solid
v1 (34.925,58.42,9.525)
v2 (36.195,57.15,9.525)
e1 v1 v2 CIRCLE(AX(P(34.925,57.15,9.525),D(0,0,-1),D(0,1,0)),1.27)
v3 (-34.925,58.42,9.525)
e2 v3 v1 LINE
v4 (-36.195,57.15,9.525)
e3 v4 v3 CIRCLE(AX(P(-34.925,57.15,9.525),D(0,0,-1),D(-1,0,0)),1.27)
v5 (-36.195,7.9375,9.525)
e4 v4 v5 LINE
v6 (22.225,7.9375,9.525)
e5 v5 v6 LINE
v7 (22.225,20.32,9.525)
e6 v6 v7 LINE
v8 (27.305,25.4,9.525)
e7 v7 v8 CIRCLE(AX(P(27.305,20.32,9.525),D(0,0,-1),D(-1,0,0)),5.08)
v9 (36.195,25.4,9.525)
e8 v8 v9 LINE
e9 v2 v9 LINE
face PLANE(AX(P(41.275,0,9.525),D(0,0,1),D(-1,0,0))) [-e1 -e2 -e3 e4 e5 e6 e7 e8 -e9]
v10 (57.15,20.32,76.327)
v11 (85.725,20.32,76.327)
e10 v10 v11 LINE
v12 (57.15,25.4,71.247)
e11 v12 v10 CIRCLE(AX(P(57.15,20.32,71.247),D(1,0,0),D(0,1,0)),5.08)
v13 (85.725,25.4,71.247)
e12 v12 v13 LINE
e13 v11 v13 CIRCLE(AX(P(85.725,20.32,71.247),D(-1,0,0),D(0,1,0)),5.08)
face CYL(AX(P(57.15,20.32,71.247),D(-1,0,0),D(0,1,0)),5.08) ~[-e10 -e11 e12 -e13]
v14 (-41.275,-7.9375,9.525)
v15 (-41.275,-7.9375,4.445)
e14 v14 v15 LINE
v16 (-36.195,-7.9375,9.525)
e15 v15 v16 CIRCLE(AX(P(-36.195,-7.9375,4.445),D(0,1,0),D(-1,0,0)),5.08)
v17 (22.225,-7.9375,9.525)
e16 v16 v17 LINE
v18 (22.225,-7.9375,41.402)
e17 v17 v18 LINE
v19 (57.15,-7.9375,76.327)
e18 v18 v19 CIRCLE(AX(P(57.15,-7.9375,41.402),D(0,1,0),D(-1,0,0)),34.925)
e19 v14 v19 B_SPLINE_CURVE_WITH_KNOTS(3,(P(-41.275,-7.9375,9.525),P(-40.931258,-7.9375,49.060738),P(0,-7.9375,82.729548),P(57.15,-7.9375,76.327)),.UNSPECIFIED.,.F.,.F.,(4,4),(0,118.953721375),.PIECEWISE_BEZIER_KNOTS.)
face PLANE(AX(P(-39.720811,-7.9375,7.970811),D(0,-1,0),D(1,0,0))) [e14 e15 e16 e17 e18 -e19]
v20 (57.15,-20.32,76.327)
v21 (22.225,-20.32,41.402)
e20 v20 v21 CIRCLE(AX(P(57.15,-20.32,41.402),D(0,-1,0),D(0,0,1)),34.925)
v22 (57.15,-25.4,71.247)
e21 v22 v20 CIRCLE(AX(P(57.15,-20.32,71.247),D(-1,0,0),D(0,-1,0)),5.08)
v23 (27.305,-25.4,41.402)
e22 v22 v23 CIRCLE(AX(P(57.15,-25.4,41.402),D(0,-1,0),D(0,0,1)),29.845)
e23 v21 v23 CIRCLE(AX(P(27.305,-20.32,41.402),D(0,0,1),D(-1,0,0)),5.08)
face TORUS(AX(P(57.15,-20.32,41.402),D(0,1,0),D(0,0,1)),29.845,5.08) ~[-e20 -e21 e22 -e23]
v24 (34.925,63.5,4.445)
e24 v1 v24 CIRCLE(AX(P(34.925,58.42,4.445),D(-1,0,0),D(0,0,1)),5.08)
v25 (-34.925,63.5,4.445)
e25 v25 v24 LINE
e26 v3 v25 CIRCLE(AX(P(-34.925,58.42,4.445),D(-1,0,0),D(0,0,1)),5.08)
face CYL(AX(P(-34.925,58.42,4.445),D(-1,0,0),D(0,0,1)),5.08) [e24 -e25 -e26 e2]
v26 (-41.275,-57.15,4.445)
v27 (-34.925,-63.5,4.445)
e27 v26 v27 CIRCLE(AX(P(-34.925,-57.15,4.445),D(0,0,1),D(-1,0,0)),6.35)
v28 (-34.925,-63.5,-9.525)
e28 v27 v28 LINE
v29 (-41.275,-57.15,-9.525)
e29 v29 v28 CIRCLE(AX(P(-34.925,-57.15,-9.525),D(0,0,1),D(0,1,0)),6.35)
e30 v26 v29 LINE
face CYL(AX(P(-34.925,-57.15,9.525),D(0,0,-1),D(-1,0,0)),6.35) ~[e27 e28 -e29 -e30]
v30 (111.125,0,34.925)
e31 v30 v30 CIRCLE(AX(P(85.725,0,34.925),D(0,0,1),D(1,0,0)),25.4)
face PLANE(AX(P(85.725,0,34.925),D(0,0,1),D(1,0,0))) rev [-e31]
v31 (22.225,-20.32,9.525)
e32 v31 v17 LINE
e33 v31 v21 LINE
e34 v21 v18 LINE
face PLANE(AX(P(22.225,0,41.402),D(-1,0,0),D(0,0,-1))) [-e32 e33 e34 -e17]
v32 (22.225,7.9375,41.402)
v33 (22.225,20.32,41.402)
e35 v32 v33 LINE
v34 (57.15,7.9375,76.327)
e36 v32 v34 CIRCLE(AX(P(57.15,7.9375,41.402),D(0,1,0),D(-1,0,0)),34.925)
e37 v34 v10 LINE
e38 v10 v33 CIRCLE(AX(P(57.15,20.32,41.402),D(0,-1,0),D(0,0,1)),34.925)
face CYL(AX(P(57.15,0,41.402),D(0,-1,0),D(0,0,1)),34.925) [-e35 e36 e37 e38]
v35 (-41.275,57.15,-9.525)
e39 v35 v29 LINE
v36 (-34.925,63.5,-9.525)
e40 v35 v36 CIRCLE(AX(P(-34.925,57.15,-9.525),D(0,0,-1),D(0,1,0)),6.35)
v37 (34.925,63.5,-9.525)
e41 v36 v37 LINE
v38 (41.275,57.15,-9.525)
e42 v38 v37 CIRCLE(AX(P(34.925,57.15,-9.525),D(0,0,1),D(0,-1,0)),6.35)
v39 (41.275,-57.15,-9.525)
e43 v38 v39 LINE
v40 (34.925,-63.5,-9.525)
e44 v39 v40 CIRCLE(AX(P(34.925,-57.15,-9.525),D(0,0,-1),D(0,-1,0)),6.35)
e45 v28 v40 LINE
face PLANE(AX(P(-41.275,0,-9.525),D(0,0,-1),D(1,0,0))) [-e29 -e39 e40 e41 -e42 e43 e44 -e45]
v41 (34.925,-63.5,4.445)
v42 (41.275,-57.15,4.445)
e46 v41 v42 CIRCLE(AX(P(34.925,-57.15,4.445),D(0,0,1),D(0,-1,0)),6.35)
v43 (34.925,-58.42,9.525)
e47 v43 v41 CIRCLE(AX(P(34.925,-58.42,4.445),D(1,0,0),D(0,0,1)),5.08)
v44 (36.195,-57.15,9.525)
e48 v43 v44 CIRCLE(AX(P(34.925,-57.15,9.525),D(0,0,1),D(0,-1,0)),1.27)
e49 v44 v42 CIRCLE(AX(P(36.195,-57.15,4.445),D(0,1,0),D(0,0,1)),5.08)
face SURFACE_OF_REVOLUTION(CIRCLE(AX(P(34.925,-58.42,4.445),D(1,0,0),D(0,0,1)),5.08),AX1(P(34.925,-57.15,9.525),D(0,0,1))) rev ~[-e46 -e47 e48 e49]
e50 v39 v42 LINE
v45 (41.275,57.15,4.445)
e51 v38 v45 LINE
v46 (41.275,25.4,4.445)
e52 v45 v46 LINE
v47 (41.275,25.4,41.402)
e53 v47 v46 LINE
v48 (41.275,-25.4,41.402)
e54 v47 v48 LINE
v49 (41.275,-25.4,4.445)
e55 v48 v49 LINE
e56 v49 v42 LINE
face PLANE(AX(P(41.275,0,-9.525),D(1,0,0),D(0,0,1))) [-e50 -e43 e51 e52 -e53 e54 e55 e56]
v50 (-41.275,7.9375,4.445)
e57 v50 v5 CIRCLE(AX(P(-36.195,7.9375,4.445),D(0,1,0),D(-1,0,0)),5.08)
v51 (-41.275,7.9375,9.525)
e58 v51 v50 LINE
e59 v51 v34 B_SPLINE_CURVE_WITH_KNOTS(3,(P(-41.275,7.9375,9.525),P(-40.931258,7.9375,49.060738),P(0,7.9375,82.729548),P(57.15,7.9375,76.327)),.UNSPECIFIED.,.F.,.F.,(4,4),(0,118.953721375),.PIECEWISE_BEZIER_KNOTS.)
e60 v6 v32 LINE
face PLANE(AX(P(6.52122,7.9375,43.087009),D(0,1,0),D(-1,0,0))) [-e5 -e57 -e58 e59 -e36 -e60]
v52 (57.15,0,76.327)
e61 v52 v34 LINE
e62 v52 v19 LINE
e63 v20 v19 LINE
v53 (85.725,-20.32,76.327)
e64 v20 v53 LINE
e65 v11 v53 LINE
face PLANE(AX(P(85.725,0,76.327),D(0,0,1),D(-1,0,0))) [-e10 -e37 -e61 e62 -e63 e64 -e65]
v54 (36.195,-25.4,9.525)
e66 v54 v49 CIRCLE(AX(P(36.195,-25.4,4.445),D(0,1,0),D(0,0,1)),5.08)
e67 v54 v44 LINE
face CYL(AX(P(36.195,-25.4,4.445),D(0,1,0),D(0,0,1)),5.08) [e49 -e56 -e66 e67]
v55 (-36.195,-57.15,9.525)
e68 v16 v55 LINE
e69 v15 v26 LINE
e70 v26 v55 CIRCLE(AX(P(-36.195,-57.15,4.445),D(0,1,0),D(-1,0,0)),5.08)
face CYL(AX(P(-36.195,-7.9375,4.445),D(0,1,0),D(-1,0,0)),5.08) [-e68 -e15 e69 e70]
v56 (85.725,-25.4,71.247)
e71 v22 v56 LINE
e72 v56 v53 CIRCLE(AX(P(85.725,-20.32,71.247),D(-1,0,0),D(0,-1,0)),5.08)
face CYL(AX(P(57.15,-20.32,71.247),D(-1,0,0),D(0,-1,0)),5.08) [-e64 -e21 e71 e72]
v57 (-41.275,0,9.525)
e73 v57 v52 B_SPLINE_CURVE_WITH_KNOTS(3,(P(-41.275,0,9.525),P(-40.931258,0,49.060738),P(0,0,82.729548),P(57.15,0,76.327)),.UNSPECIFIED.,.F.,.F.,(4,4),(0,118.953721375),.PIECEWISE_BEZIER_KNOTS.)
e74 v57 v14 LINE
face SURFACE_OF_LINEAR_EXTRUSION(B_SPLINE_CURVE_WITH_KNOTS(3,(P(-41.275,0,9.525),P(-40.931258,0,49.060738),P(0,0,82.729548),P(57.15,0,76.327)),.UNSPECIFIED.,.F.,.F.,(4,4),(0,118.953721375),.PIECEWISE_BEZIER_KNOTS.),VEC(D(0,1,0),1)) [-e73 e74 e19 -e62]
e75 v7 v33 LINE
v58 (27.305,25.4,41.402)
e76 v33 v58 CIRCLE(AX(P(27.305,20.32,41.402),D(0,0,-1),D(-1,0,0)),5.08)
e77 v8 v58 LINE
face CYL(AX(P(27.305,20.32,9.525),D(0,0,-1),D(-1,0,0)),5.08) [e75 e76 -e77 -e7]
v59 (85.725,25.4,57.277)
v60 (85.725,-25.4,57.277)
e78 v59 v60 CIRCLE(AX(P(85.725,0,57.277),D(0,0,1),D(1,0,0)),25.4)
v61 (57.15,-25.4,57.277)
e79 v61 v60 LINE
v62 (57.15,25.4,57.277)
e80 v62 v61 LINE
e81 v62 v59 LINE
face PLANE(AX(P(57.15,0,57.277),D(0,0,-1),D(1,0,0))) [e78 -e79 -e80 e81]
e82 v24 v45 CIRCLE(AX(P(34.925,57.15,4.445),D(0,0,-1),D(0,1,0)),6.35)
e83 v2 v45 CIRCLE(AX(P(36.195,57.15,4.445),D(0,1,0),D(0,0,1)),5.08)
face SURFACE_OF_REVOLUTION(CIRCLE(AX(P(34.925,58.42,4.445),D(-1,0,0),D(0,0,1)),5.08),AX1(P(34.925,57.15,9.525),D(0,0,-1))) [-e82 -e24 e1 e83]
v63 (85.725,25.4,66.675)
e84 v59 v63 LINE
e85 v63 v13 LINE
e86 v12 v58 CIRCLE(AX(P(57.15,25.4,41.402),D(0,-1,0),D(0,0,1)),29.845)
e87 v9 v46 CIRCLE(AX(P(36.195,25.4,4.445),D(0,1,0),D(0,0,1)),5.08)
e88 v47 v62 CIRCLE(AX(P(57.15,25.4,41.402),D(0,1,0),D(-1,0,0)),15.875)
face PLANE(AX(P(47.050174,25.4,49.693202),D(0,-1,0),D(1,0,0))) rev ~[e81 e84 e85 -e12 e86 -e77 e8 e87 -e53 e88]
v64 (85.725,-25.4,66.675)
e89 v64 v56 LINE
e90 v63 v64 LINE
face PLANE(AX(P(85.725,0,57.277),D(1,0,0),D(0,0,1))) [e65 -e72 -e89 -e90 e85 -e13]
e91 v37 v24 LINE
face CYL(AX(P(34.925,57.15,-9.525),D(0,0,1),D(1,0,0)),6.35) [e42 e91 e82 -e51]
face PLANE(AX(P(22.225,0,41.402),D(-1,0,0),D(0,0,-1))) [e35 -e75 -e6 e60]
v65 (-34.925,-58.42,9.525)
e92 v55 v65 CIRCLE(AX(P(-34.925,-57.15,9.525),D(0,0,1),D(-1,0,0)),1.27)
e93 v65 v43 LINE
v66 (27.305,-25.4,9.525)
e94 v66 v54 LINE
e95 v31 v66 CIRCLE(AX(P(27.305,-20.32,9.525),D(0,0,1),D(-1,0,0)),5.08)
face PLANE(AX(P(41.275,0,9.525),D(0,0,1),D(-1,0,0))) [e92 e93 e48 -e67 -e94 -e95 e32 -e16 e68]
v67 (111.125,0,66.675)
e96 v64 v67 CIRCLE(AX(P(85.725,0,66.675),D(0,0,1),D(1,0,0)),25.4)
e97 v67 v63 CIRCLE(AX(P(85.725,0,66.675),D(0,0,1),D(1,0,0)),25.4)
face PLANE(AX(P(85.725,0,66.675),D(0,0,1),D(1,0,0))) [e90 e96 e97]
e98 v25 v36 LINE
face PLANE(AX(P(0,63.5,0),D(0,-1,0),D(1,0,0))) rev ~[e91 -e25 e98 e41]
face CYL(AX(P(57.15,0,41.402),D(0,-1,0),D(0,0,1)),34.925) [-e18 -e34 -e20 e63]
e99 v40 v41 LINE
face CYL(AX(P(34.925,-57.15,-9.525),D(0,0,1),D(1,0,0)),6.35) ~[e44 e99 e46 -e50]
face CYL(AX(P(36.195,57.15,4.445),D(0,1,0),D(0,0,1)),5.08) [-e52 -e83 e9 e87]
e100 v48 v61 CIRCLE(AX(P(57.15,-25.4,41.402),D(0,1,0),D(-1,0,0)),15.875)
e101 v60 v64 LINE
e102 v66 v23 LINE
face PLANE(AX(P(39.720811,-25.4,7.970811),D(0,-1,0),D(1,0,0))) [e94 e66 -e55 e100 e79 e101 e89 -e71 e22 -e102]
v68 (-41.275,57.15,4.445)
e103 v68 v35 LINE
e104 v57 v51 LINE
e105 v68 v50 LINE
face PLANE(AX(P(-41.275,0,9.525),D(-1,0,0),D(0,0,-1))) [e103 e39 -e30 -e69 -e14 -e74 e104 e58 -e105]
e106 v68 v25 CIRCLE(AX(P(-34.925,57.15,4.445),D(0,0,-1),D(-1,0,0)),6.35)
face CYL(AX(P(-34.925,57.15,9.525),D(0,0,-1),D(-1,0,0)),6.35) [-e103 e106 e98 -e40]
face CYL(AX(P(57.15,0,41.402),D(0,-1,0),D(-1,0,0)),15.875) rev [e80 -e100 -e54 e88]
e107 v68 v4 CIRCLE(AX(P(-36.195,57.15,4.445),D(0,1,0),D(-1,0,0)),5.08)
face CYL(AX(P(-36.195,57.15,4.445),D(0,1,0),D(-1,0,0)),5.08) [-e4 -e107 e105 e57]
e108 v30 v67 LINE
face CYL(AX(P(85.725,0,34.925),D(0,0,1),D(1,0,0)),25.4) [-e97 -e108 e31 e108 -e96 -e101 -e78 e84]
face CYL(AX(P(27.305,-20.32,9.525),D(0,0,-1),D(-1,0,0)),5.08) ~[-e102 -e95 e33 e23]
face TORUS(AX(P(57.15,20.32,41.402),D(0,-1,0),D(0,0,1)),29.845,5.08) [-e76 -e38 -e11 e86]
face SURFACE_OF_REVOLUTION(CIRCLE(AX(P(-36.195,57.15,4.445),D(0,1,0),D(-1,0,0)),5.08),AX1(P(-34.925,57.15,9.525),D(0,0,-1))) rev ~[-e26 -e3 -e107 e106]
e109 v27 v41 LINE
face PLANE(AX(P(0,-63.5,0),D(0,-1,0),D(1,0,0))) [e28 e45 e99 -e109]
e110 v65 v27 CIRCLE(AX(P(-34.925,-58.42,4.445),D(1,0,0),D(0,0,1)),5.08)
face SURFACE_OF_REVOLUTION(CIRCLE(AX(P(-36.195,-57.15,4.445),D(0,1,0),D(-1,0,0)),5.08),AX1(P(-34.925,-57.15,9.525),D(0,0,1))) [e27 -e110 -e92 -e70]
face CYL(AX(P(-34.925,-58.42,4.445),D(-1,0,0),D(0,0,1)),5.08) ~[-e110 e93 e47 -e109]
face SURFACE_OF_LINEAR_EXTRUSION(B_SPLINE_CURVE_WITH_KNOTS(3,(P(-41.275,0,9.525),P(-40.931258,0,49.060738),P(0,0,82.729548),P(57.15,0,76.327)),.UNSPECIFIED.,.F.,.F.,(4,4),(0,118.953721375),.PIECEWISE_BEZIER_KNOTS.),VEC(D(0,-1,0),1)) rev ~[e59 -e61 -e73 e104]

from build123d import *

# Parameters (mm, degrees)
F1_DEPTH     = 63.5
F0_W         = 25.4
F0_H         = 9.398
F2_DEPTH     = 25.4
F3_DEPTH     = 7.9375
F5_R         = 6.35
F6_T1_DEPTH  = 41.275
F6_T3_DEPTH  = 69.85
F6_T5_DEPTH  = 49.2125
F6_T7_DEPTH  = 49.2125
F6_T9_DEPTH  = 31.75
F6_T11_DEPTH = 31.75
F6_T13_DEPTH = 31.877
F6_T16_ANGLE = 90
F6_T18_ANGLE = 90
F6_T20_ANGLE = 90
F6_T22_ANGLE = 90
F6_T24_ANGLE = 90
F6_T26_ANGLE = 90


# Not quite as in the source:
# - a fillet or chamfer that OpenCascade refuses, or shapes differently, is made with other operations: its cross-section is extruded or revolved along the edge and cut away or added


with BuildPart() as f1:
    # F0 (on Front) → F1 (new body, symmetric)
    with BuildSketch(Plane.XZ):
        Polygon((-41.275, 9.525), (-41.275, -9.525), (41.275, -9.525), (41.275, 9.525), (22.225, 9.525), align=None)
    extrude(amount=F1_DEPTH, both=True)

    # F0 (on Front) → F2 (join, symmetric)
    with BuildSketch(Plane.XZ):
        with BuildLine():
            Line((22.225, 9.525), (41.275, 9.525))
            Line((41.275, 9.525), (41.275, 41.402))
            ThreePointArc((41.275, 41.402), (45.9246798487, 52.6273201513), (57.15, 57.277))
            Line((57.15, 57.277), (60.325, 57.277))
            Line((60.325, 57.277), (60.325, 66.675))
            Line((60.325, 66.675), (85.725, 66.675))
            Line((85.725, 66.675), (85.725, 76.327))
            Line((85.725, 76.327), (57.15, 76.327))
            ThreePointArc((57.15, 76.327), (32.4542956671, 66.0977043329), (22.225, 41.402))
            Line((22.225, 41.402), (22.225, 9.525))
        make_face()
        with Locations((73.025, 61.976)):
            Rectangle(F0_W, F0_H)
    extrude(amount=F2_DEPTH, both=True)

    # F0 (on Front) → F3 (join, symmetric)
    with BuildSketch(Plane.XZ):
        with BuildLine():
            add(Edge.make_bspline(
                [(-41.275, 9.525), (-40.9312584529, 49.0607376979), (0, 82.7295482159), (57.15, 76.327)],
                knots=[0, 0, 0, 0, 118.9537213752, 118.9537213752, 118.9537213752, 118.9537213752], degree=3))
            Line((-41.275, 9.525), (22.225, 9.525))
            Line((22.225, 9.525), (22.225, 41.402))
            ThreePointArc((22.225, 41.402), (32.4542956671, 66.0977043329), (57.15, 76.327))
        make_face()
    extrude(amount=F3_DEPTH, both=True)

    # F0 (on Front) → F4 (revolve)
    with BuildSketch(Plane.XZ):
        Polygon((111.125, 66.675), (85.725, 66.675), (85.725, 57.277), (85.725, 34.925), (111.125, 34.925), align=None)
    revolve(axis=Axis((85.725, 0, 55.626), (0, 0, 1)))

    # F5
    f5_edges = [f1.edges().sort_by_distance(p)[0] for p in [
        (41.275, 63.5, 0),
        (-41.275, 63.5, 0),
        (-41.275, -63.5, 0),
        (41.275, -63.5, 0),
    ]]
    fillet(f5_edges, radius=F5_R)

    # F6: fillet of radius 5.08 on 16 edges, made by hand

    # F6_s2 → F6_t1 (cut)
    with BuildSketch(Plane.YZ.offset(57.15)):
        with BuildLine():
            ThreePointArc((25.4, 71.247), (23.9121024484, 74.8391024484), (20.32, 76.327))
            Line((20.32, 76.327), (25.4, 76.327))
            Line((25.4, 76.327), (25.4, 71.247))
        make_face()
        with BuildLine():
            ThreePointArc((-25.4, 71.247), (-23.9121024484, 74.8391024484), (-20.32, 76.327))
            Line((-20.32, 76.327), (-25.4, 76.327))
            Line((-25.4, 76.327), (-25.4, 71.247))
        make_face()
    extrude(amount=F6_T1_DEPTH, mode=Mode.SUBTRACT)

    # F6_s4 → F6_t3 (cut)
    with BuildSketch(Plane.YZ.offset(-34.925)):
        with BuildLine():
            ThreePointArc((-58.42, 9.525), (-62.0121024484, 8.0371024484), (-63.5, 4.445))
            Line((-63.5, 4.445), (-63.5, 9.525))
            Line((-63.5, 9.525), (-58.42, 9.525))
        make_face()
        with BuildLine():
            ThreePointArc((58.42, 9.525), (62.0121024484, 8.0371024484), (63.5, 4.445))
            Line((63.5, 4.445), (63.5, 9.525))
            Line((63.5, 9.525), (58.42, 9.525))
        make_face()
    extrude(amount=F6_T3_DEPTH, mode=Mode.SUBTRACT)

    # F6_s6 → F6_t5 (cut)
    with BuildSketch(Plane.XZ.offset(-57.15)):
        with BuildLine():
            ThreePointArc((-41.275, 4.445), (-39.7871024484, 8.0371024484), (-36.195, 9.525))
            Line((-36.195, 9.525), (-41.275, 9.525))
            Line((-41.275, 9.525), (-41.275, 4.445))
        make_face()
    extrude(amount=F6_T5_DEPTH, mode=Mode.SUBTRACT)

    # F6_s8 → F6_t7 (cut)
    with BuildSketch(Plane.XZ.offset(7.9375)):
        with BuildLine():
            ThreePointArc((-41.275, 4.445), (-39.7871024484, 8.0371024484), (-36.195, 9.525))
            Line((-36.195, 9.525), (-41.275, 9.525))
            Line((-41.275, 9.525), (-41.275, 4.445))
        make_face()
    extrude(amount=F6_T7_DEPTH, mode=Mode.SUBTRACT)

    # F6_s10 → F6_t9 (cut)
    with BuildSketch(Plane.XZ.offset(-57.15)):
        with BuildLine():
            ThreePointArc((36.195, 9.525), (39.7871024484, 8.0371024484), (41.275, 4.445))
            Line((41.275, 4.445), (41.275, 9.525))
            Line((41.275, 9.525), (36.195, 9.525))
        make_face()
    extrude(amount=F6_T9_DEPTH, mode=Mode.SUBTRACT)

    # F6_s12 → F6_t11 (cut)
    with BuildSketch(Plane.XZ.offset(25.4)):
        with BuildLine():
            ThreePointArc((36.195, 9.525), (39.7871024484, 8.0371024484), (41.275, 4.445))
            Line((41.275, 4.445), (41.275, 9.525))
            Line((41.275, 9.525), (36.195, 9.525))
        make_face()
    extrude(amount=F6_T11_DEPTH, mode=Mode.SUBTRACT)

    # F6_s14 → F6_t13 (cut)
    with BuildSketch(Plane.XY.offset(9.525)):
        with BuildLine():
            ThreePointArc((22.225, 20.32), (23.7128975516, 23.9121024484), (27.305, 25.4))
            Line((27.305, 25.4), (22.225, 25.4))
            Line((22.225, 25.4), (22.225, 20.32))
        make_face()
        with BuildLine():
            ThreePointArc((22.225, -20.32), (23.7128975516, -23.9121024484), (27.305, -25.4))
            Line((27.305, -25.4), (22.225, -25.4))
            Line((22.225, -25.4), (22.225, -20.32))
        make_face()
    extrude(amount=F6_T13_DEPTH, mode=Mode.SUBTRACT)

    # F6_s15 → F6_t16 (revolve, cut)
    with BuildSketch(Plane.XZ.offset(-57.15)):
        with BuildLine():
            ThreePointArc((-41.275, 4.445), (-39.7871024484, 8.0371024484), (-36.195, 9.525))
            Line((-36.195, 9.525), (-41.275, 9.525))
            Line((-41.275, 9.525), (-41.275, 4.445))
        make_face()
    revolve(axis=Axis((-34.925, 57.15, 9.525), (0, 0, -1)), revolution_arc=F6_T16_ANGLE, mode=Mode.SUBTRACT)

    # F6_s17 → F6_t18 (revolve, cut)
    with BuildSketch(Plane.XZ.offset(57.15)):
        with BuildLine():
            ThreePointArc((-41.275, 4.445), (-39.7871024484, 8.0371024484), (-36.195, 9.525))
            Line((-36.195, 9.525), (-41.275, 9.525))
            Line((-41.275, 9.525), (-41.275, 4.445))
        make_face()
    revolve(axis=Axis((-34.925, -57.15, 9.525), (0, 0, 1)), revolution_arc=F6_T18_ANGLE, mode=Mode.SUBTRACT)

    # F6_s19 → F6_t20 (revolve, cut)
    with BuildSketch(Plane.YZ.offset(34.925)):
        with BuildLine():
            ThreePointArc((58.42, 9.525), (62.0121024484, 8.0371024484), (63.5, 4.445))
            Line((63.5, 4.445), (63.5, 9.525))
            Line((63.5, 9.525), (58.42, 9.525))
        make_face()
    revolve(axis=Axis((34.925, 57.15, 9.525), (0, 0, -1)), revolution_arc=F6_T20_ANGLE, mode=Mode.SUBTRACT)

    # F6_s21 → F6_t22 (revolve, cut)
    with BuildSketch(Plane.YZ.offset(34.925)):
        with BuildLine():
            ThreePointArc((-58.42, 9.525), (-62.0121024484, 8.0371024484), (-63.5, 4.445))
            Line((-63.5, 4.445), (-63.5, 9.525))
            Line((-63.5, 9.525), (-58.42, 9.525))
        make_face()
    revolve(axis=Axis((34.925, -57.15, 9.525), (0, 0, 1)), revolution_arc=F6_T22_ANGLE, mode=Mode.SUBTRACT)

    # F6_s23 → F6_t24 (revolve, cut)
    with BuildSketch(Plane.YZ.offset(57.15)):
        with BuildLine():
            ThreePointArc((25.4, 71.247), (23.9121024484, 74.8391024484), (20.32, 76.327))
            Line((20.32, 76.327), (25.4, 76.327))
            Line((25.4, 76.327), (25.4, 71.247))
        make_face()
    revolve(axis=Axis((57.15, 25.4, 41.402), (0, -1, 0)), revolution_arc=F6_T24_ANGLE, mode=Mode.SUBTRACT)

    # F6_s25 → F6_t26 (revolve, cut)
    with BuildSketch(Plane.YZ.offset(57.15)):
        with BuildLine():
            ThreePointArc((-25.4, 71.247), (-23.9121024484, 74.8391024484), (-20.32, 76.327))
            Line((-20.32, 76.327), (-25.4, 76.327))
            Line((-25.4, 76.327), (-25.4, 71.247))
        make_face()
    revolve(axis=Axis((57.15, -25.4, 41.402), (0, -1, 0)), revolution_arc=F6_T26_ANGLE, mode=Mode.SUBTRACT)


solid = f1.part
